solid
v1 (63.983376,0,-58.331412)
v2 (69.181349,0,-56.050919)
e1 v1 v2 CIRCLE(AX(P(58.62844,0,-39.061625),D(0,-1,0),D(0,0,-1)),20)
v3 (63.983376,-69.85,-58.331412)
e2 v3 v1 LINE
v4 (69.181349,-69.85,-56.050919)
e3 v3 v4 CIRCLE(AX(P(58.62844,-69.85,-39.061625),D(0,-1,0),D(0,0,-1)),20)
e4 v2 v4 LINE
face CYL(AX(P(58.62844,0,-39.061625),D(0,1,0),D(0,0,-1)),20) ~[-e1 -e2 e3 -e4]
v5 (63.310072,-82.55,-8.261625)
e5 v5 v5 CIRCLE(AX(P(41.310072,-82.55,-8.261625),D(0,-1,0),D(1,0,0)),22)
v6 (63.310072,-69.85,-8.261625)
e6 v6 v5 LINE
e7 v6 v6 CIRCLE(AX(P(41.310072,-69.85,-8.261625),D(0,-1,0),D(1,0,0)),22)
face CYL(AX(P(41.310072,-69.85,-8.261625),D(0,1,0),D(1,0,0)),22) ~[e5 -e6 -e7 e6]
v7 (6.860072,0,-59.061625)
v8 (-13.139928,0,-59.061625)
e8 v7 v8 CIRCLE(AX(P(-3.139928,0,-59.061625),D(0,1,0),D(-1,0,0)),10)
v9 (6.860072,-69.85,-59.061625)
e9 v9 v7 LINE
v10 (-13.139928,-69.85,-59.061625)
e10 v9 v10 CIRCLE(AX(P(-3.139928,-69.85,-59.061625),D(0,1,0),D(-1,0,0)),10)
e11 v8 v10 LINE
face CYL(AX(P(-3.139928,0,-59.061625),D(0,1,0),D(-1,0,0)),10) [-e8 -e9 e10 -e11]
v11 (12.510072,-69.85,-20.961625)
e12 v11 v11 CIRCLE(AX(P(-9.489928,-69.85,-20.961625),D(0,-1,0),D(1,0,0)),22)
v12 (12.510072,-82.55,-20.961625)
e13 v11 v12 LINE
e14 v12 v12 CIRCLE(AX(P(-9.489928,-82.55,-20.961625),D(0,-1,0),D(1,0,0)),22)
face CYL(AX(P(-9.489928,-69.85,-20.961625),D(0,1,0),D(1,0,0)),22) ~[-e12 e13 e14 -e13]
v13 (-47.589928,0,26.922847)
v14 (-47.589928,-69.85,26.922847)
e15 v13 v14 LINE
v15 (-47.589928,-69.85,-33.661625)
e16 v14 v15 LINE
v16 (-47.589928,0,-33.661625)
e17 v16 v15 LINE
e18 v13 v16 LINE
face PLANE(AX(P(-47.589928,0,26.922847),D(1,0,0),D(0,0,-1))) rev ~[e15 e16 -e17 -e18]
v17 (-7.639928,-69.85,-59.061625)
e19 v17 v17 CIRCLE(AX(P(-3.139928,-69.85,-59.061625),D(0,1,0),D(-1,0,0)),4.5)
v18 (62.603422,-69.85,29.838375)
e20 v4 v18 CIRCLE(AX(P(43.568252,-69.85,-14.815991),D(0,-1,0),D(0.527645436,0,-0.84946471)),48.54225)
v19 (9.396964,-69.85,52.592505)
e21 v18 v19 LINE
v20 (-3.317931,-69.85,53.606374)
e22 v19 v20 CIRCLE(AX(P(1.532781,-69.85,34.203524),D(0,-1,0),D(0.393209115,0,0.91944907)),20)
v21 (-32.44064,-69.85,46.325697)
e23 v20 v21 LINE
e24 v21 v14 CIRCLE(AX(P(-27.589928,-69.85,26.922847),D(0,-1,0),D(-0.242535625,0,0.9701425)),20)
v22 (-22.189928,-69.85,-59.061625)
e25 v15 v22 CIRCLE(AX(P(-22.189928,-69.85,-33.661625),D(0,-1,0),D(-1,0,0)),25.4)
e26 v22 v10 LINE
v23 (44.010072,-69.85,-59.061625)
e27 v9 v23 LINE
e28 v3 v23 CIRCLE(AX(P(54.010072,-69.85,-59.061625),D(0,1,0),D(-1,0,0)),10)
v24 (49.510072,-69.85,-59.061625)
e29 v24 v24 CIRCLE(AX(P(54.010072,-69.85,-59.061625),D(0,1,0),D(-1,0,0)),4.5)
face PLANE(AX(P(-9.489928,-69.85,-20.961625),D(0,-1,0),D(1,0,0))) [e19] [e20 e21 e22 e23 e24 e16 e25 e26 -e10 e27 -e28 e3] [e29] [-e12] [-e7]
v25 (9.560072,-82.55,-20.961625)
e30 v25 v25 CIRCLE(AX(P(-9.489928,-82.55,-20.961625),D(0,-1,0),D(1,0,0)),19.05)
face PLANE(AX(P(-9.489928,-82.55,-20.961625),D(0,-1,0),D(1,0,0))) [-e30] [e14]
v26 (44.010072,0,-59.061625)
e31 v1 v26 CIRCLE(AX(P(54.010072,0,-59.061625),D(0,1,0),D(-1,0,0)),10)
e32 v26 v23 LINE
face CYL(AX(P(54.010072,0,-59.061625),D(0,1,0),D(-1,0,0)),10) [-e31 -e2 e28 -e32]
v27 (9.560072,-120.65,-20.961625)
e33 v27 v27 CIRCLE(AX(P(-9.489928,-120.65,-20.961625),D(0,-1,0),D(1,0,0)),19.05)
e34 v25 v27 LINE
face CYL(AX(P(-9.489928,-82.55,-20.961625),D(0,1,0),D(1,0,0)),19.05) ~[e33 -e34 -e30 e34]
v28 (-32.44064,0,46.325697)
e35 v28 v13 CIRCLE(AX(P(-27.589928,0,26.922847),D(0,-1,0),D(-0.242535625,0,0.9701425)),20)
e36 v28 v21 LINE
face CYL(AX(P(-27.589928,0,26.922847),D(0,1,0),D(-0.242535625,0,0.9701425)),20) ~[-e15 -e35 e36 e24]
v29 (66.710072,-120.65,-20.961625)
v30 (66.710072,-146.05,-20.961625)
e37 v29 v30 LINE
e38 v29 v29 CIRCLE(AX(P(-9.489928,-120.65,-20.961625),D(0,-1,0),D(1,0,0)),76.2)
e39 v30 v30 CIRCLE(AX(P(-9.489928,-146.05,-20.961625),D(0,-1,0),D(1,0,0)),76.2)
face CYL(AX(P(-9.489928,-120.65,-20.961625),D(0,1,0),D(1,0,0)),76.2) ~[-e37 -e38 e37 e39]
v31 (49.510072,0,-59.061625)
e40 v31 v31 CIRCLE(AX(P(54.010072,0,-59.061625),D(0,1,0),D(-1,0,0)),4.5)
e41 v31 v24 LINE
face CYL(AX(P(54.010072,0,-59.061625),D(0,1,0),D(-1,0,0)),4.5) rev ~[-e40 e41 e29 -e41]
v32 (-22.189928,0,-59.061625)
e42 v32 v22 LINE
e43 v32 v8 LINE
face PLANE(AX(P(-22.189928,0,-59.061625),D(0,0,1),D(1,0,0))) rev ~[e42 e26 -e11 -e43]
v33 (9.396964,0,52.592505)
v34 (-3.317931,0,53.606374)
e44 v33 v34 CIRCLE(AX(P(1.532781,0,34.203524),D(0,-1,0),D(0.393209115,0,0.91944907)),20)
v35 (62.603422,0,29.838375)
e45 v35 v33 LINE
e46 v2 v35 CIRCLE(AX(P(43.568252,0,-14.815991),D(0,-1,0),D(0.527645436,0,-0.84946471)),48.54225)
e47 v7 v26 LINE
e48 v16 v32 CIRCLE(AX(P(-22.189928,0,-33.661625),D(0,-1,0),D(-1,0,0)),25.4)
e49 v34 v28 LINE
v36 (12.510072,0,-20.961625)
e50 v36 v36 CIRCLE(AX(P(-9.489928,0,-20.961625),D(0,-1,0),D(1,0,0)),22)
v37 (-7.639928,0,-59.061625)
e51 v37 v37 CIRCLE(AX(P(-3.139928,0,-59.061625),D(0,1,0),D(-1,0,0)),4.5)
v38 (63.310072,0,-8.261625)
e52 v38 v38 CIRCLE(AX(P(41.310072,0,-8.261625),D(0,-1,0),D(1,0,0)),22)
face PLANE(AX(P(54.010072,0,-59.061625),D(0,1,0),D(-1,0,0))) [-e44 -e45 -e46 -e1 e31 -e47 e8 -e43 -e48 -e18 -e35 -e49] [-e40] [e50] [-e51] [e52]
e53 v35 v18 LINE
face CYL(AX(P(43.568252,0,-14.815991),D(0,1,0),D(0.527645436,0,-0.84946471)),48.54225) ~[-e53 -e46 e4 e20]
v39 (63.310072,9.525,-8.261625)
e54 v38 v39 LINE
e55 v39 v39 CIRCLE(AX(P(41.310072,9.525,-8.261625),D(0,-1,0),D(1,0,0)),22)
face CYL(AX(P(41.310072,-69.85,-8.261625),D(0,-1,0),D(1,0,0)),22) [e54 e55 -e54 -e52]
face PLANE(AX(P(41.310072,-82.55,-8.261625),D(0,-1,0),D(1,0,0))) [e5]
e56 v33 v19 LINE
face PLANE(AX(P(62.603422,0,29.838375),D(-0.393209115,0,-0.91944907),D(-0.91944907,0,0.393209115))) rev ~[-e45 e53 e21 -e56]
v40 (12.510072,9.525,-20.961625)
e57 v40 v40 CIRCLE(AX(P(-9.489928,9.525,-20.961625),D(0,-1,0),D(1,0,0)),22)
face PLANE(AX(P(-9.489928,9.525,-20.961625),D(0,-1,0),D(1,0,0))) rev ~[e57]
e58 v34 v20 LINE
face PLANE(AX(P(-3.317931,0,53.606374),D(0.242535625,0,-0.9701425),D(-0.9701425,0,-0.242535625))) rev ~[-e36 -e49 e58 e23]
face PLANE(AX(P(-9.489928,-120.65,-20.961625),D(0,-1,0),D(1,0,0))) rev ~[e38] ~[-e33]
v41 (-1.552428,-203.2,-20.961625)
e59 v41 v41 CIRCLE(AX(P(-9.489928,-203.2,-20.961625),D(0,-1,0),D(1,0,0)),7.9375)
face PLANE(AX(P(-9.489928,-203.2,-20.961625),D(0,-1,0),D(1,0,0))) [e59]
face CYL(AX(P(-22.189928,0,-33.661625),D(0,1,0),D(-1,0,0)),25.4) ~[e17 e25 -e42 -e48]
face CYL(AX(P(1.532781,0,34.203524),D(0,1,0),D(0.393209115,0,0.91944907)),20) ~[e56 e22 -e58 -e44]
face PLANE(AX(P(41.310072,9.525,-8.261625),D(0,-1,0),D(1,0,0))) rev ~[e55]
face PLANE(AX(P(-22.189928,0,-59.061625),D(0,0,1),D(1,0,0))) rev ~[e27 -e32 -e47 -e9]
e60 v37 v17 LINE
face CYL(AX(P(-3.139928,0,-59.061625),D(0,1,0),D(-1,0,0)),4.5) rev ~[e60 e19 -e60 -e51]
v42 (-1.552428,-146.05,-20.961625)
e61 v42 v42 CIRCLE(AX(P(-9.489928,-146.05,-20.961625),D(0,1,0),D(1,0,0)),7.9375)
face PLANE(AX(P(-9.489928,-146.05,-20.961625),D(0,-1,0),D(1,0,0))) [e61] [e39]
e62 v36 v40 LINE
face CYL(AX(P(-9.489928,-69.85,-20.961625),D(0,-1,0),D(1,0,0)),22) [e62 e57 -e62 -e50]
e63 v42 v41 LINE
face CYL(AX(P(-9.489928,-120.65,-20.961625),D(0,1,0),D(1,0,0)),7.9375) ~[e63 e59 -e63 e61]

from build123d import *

# Parameters (mm, degrees)
F1_DEPTH      = 69.85
F2_R          = 22
F3_DEPTH      = 79.375
F3_DEPTH_BACK = 12.7
F4_R          = 10
F5_DEPTH      = 69.85
F6_R          = 4.5
F7_DEPTH      = 82.551
F8_R          = 19.05
F9_DEPTH      = 38.1
F10_R         = 7.9375
F11_DEPTH     = 82.55
F12_R         = 76.2
F13_DEPTH     = 25.4


# Not quite as in the source:
# - a length typed as a fraction of an inch, garbled in the dataset ("3 / 203.2 mm" for 3/8 in), is restored


with BuildPart() as f1:
    # F0 (on Front) → F1 (new body)
    with BuildSketch(Plane.XZ):
        with BuildLine():
            ThreePointArc((-32.4406404125, 46.3256966582), (-43.3540366721, 39.2310908433), (-47.5899279118, 26.9228466552))
            Line((-47.5899279118, 26.9228466552), (-47.5899279118, -33.6616252167))
            ThreePointArc((-47.5899279118, -33.6616252167), (-40.1504401539, -51.6221374588), (-22.1899279118, -59.0616252167))
            Line((-22.1899279118, -59.0616252167), (58.6284401518, -59.0616252167))
            ThreePointArc((58.6284401518, -59.0616252167), (64.1154300354, -58.2942262372), (69.1813488754, -56.0509194183))
            ThreePointArc((69.1813488754, -56.0509194183), (91.9687648373, -11.1091837062), (62.6034215093, 29.8383747833))
            Line((62.6034215093, 29.8383747833), (9.3969636816, 52.592505372))
            ThreePointArc((9.3969636816, 52.592505372), (3.1225085413, 54.1402430548), (-3.3179311218, 53.6063739808))
            Line((-3.3179311218, 53.6063739808), (-32.4406404125, 46.3256966582))
        make_face()
    extrude(amount=F1_DEPTH)

    # F2 (on face) → F3 (join, two sides)
    with BuildSketch(Plane.XZ.offset(69.85)) as f3_sk:
        with Locations((-9.4899279118, -20.9616252167)):
            Circle(F2_R)
        with Locations((41.3100720882, -8.2616252167)):
            Circle(F2_R)
    extrude(amount=-F3_DEPTH)
    extrude(f3_sk.sketch, amount=F3_DEPTH_BACK)

    # F4 (on face) → F5 (join, through all)
    with BuildSketch(Plane(origin=(0, 0, 0), x_dir=(-1, 0, 0), z_dir=(0, 1, 0))):
        with Locations((-54.0100720882, -59.0616252167)):
            Circle(F4_R)
        with Locations((3.1399279118, -59.0616252167)):
            Circle(F4_R)
    extrude(amount=-F5_DEPTH)

    # F6 (on face) → F7 (cut, through all)
    with BuildSketch(Plane(origin=(0, 0, 0), x_dir=(-1, 0, 0), z_dir=(0, 1, 0))):
        with Locations((-54.0100720882, -59.0616252167)):
            Circle(F6_R)
        with Locations((3.1399279118, -59.0616252167)):
            Circle(F6_R)
    extrude(amount=-F7_DEPTH, mode=Mode.SUBTRACT)

    # F8 (on face) → F9 (join)
    with BuildSketch(Plane.XZ.offset(82.55)):
        with Locations((-9.4899279118, -20.9616252167)):
            Circle(F8_R)
    extrude(amount=F9_DEPTH)

    # F10 (on face) → F11 (join)
    with BuildSketch(Plane.XZ.offset(120.65)):
        with Locations((-9.4899279118, -20.9616252167)):
            Circle(F10_R)
    extrude(amount=F11_DEPTH)

    # F12 (on face) → F13 (join)
    with BuildSketch(Plane.XZ.offset(120.65)):
        with Locations((-9.4899279118, -20.9616252167)):
            Circle(F12_R)
    extrude(amount=F13_DEPTH)


solid = f1.part
